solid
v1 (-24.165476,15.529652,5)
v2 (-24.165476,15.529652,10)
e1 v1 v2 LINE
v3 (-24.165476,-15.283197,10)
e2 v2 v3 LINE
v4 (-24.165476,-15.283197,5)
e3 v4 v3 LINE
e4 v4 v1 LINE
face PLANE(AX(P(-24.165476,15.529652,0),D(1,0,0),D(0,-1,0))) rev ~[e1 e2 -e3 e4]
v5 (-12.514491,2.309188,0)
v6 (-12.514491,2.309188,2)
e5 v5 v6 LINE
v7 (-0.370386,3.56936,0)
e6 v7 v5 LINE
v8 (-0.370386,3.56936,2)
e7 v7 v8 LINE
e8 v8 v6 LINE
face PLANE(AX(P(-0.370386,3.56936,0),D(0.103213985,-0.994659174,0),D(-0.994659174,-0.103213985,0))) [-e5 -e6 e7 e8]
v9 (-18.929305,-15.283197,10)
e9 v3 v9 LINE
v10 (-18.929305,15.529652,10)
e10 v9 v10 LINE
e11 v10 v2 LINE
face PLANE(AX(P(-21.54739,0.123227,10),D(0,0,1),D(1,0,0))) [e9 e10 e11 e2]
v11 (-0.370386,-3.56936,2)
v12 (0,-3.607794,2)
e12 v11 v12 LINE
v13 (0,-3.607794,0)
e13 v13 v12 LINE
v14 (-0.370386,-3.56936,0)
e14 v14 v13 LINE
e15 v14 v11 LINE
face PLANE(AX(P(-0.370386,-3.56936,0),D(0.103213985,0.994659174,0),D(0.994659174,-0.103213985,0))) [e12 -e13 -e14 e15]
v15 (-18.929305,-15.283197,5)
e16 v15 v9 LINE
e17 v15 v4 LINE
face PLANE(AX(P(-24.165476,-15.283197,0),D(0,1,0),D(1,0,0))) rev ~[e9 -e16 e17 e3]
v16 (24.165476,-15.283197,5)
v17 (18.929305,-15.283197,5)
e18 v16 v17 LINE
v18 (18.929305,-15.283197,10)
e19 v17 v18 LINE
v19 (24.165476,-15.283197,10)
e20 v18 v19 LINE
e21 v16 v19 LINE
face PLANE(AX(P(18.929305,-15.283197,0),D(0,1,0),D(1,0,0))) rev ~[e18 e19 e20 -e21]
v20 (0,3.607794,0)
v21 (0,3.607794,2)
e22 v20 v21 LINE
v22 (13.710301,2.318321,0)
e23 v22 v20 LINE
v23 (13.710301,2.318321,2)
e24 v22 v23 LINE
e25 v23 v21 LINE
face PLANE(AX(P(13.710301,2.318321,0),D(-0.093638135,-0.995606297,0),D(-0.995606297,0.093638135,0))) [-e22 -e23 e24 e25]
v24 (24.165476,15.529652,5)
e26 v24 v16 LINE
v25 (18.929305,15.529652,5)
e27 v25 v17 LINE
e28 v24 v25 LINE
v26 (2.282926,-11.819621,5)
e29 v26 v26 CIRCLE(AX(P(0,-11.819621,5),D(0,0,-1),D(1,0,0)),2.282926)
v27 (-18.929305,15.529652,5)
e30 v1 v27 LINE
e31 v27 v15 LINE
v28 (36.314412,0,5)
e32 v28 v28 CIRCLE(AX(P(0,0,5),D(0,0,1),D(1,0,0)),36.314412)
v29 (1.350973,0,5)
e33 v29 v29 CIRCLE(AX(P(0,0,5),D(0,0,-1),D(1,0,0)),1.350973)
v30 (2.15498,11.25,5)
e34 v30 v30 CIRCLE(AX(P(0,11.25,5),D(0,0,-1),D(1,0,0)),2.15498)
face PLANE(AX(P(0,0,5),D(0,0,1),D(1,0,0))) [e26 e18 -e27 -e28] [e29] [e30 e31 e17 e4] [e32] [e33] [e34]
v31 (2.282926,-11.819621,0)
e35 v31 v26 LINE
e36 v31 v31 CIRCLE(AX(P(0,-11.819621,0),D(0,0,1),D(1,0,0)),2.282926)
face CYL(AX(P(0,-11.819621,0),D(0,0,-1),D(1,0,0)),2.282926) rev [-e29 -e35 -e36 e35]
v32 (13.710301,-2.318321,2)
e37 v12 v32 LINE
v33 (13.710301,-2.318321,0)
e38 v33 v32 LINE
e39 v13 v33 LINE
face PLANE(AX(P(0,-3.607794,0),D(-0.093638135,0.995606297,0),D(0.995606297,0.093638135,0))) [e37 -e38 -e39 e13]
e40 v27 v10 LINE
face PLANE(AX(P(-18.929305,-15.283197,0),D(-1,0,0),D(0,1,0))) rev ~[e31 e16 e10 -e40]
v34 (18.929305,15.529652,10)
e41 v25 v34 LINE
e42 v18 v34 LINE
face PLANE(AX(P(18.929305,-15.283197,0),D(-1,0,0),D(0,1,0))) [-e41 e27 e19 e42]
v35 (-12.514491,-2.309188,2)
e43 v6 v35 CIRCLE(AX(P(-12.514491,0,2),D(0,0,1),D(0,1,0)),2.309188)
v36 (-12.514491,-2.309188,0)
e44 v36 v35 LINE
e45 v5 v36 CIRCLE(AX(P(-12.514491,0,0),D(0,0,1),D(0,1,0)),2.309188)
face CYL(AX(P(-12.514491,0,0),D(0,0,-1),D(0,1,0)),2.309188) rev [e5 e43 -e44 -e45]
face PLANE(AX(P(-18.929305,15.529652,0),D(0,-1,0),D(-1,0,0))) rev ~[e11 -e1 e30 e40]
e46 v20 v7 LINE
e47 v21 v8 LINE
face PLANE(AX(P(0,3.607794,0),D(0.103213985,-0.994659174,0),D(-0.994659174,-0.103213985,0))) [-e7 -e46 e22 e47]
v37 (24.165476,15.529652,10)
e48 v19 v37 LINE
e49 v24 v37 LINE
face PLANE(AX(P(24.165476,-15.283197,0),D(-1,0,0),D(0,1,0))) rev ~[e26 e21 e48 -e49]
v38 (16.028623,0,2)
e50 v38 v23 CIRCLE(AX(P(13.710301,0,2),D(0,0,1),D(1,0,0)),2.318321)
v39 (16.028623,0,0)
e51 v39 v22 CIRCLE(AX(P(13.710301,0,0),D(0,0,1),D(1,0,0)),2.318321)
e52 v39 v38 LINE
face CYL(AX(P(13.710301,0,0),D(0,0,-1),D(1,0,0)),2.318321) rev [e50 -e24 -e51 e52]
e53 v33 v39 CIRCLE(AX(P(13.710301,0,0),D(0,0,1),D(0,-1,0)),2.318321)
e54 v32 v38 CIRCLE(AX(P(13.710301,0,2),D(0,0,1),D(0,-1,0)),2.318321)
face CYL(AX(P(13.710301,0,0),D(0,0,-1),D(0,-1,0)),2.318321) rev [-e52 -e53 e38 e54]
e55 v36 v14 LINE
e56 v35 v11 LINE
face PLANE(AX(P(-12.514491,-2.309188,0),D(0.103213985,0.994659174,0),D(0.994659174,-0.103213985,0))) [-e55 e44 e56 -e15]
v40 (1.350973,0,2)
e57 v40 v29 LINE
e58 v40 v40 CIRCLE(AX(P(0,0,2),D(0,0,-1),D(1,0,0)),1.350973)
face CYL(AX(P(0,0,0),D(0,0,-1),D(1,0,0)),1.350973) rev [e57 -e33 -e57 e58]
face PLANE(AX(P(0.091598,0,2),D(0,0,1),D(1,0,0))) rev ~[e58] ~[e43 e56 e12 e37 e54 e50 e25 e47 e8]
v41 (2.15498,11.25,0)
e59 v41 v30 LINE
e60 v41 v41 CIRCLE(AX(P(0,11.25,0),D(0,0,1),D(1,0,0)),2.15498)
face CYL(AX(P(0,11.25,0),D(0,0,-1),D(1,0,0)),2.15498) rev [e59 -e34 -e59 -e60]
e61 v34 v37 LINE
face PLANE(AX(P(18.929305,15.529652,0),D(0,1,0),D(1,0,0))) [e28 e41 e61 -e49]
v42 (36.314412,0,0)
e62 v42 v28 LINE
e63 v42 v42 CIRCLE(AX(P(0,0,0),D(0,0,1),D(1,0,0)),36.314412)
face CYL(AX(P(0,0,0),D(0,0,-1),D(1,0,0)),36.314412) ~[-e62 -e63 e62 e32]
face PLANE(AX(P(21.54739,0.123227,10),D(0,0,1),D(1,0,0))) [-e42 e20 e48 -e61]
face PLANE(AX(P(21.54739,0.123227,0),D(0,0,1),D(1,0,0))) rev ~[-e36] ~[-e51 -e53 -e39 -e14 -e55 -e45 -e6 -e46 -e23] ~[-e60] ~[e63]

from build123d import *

# Parameters (mm, degrees)
F0_R     = 36.3144122586
F3_DEPTH = 5
F1_W     = 5.236171186
F1_H     = 30.8128492907
F4_DEPTH = 10
F2_R     = 2.2829264836
F2_R_2   = 1.3509728807
F2_R_3   = 2.1549795906
F5_DEPTH = 25
F7_DEPTH = 2


with BuildPart() as f3:
    # F0 (on Top) → F3 (new body)
    with BuildSketch(Plane.XY):
        Circle(F0_R)
    extrude(amount=F3_DEPTH)

    # F1 (on Top) → F4 (join)
    with BuildSketch(Plane.XY):
        with Locations((21.547390148, 0.1232274808)):
            Rectangle(F1_W, F1_H)
        Polygon((-24.165475741, 15.5296521261), (-24.165475741, 0), (-24.165475741, -15.2831971645), (-18.9293045551, -15.2831971645), (-18.9293045551, 15.5296521261), align=None)
    extrude(amount=F4_DEPTH)

    # F2 (on Top) → F5 (cut)
    with BuildSketch(Plane.XY):
        with Locations((0, -11.8196206167)):
            Circle(F2_R)
        Circle(F2_R_2)
        with Locations((0, 11.250000447)):
            Circle(F2_R_3)
    extrude(amount=F5_DEPTH, mode=Mode.SUBTRACT)

    # F6 (on Top) → F7 (cut)
    with BuildSketch(Plane.XY):
        with BuildLine():
            ThreePointArc((-0.3703859768, -3.5693595734), (2.402953818, -2.6652066495), (3.5885252592, 0))
            ThreePointArc((3.5885252592, 0), (2.402953818, 2.6652066495), (-0.3703859768, 3.5693595734))
            ThreePointArc((-0.3703859768, 3.5693595734), (-3.5885252592, 0), (-0.3703859768, -3.5693595734))
        make_face()
        with BuildLine():
            ThreePointArc((-0.3703859768, 3.5693595734), (2.402953818, 2.6652066495), (3.5885252592, 0))
            ThreePointArc((3.5885252592, 0), (2.402953818, -2.6652066495), (-0.3703859768, -3.5693595734))
            Line((-0.3703859768, -3.5693595734), (0, -3.6077938568))
            Line((0, -3.6077938568), (13.7103013694, -2.3183212426))
            ThreePointArc((13.7103013694, -2.3183212426), (11.3919801268, 0), (13.7103013694, 2.3183212426))
            Line((13.7103013694, 2.3183212426), (0, 3.6077938568))
            Line((0, 3.6077938568), (-0.3703859768, 3.5693595734))
        make_face()
        with BuildLine():
            ThreePointArc((-0.3703859768, -3.5693595734), (-3.5885252592, 0), (-0.3703859768, 3.5693595734))
            Line((-0.3703859768, 3.5693595734), (-12.5144906342, 2.3091877811))
            ThreePointArc((-12.5144906342, 2.3091877811), (-10.8816482952, 1.632842339), (-10.2053028531, 0))
            ThreePointArc((-10.2053028531, 0), (-10.8816482952, -1.632842339), (-12.5144906342, -2.3091877811))
            Line((-12.5144906342, -2.3091877811), (-0.3703859768, -3.5693595734))
        make_face()
        with BuildLine():
            Line((-12.5144906342, 0), (-12.5144906342, 2.3091877811))
            ThreePointArc((-12.5144906342, 2.3091877811), (-14.8236784153, 0), (-12.5144906342, -2.3091877811))
            Line((-12.5144906342, -2.3091877811), (-12.5144906342, 0))
        make_face()
        with BuildLine():
            ThreePointArc((-10.2053028531, 0), (-10.8816482952, 1.632842339), (-12.5144906342, 2.3091877811))
            Line((-12.5144906342, 2.3091877811), (-12.5144906342, 0))
            Line((-12.5144906342, 0), (-12.5144906342, -2.3091877811))
            ThreePointArc((-12.5144906342, -2.3091877811), (-10.8816482952, -1.632842339), (-10.2053028531, 0))
        make_face()
        with BuildLine():
            Line((13.7103013694, 0), (13.7103013694, 2.3183212426))
            ThreePointArc((13.7103013694, 2.3183212426), (11.3919801268, 0), (13.7103013694, -2.3183212426))
            Line((13.7103013694, -2.3183212426), (13.7103013694, 0))
        make_face()
        with BuildLine():
            ThreePointArc((16.0286226121, 0), (15.3496020411, 1.6393006716), (13.7103013694, 2.3183212426))
            Line((13.7103013694, 2.3183212426), (13.7103013694, 0))
            Line((13.7103013694, 0), (13.7103013694, -2.3183212426))
            ThreePointArc((13.7103013694, -2.3183212426), (15.3496020411, -1.6393006716), (16.0286226121, 0))
        make_face()
    extrude(amount=F7_DEPTH, mode=Mode.SUBTRACT)


solid = f3.part
